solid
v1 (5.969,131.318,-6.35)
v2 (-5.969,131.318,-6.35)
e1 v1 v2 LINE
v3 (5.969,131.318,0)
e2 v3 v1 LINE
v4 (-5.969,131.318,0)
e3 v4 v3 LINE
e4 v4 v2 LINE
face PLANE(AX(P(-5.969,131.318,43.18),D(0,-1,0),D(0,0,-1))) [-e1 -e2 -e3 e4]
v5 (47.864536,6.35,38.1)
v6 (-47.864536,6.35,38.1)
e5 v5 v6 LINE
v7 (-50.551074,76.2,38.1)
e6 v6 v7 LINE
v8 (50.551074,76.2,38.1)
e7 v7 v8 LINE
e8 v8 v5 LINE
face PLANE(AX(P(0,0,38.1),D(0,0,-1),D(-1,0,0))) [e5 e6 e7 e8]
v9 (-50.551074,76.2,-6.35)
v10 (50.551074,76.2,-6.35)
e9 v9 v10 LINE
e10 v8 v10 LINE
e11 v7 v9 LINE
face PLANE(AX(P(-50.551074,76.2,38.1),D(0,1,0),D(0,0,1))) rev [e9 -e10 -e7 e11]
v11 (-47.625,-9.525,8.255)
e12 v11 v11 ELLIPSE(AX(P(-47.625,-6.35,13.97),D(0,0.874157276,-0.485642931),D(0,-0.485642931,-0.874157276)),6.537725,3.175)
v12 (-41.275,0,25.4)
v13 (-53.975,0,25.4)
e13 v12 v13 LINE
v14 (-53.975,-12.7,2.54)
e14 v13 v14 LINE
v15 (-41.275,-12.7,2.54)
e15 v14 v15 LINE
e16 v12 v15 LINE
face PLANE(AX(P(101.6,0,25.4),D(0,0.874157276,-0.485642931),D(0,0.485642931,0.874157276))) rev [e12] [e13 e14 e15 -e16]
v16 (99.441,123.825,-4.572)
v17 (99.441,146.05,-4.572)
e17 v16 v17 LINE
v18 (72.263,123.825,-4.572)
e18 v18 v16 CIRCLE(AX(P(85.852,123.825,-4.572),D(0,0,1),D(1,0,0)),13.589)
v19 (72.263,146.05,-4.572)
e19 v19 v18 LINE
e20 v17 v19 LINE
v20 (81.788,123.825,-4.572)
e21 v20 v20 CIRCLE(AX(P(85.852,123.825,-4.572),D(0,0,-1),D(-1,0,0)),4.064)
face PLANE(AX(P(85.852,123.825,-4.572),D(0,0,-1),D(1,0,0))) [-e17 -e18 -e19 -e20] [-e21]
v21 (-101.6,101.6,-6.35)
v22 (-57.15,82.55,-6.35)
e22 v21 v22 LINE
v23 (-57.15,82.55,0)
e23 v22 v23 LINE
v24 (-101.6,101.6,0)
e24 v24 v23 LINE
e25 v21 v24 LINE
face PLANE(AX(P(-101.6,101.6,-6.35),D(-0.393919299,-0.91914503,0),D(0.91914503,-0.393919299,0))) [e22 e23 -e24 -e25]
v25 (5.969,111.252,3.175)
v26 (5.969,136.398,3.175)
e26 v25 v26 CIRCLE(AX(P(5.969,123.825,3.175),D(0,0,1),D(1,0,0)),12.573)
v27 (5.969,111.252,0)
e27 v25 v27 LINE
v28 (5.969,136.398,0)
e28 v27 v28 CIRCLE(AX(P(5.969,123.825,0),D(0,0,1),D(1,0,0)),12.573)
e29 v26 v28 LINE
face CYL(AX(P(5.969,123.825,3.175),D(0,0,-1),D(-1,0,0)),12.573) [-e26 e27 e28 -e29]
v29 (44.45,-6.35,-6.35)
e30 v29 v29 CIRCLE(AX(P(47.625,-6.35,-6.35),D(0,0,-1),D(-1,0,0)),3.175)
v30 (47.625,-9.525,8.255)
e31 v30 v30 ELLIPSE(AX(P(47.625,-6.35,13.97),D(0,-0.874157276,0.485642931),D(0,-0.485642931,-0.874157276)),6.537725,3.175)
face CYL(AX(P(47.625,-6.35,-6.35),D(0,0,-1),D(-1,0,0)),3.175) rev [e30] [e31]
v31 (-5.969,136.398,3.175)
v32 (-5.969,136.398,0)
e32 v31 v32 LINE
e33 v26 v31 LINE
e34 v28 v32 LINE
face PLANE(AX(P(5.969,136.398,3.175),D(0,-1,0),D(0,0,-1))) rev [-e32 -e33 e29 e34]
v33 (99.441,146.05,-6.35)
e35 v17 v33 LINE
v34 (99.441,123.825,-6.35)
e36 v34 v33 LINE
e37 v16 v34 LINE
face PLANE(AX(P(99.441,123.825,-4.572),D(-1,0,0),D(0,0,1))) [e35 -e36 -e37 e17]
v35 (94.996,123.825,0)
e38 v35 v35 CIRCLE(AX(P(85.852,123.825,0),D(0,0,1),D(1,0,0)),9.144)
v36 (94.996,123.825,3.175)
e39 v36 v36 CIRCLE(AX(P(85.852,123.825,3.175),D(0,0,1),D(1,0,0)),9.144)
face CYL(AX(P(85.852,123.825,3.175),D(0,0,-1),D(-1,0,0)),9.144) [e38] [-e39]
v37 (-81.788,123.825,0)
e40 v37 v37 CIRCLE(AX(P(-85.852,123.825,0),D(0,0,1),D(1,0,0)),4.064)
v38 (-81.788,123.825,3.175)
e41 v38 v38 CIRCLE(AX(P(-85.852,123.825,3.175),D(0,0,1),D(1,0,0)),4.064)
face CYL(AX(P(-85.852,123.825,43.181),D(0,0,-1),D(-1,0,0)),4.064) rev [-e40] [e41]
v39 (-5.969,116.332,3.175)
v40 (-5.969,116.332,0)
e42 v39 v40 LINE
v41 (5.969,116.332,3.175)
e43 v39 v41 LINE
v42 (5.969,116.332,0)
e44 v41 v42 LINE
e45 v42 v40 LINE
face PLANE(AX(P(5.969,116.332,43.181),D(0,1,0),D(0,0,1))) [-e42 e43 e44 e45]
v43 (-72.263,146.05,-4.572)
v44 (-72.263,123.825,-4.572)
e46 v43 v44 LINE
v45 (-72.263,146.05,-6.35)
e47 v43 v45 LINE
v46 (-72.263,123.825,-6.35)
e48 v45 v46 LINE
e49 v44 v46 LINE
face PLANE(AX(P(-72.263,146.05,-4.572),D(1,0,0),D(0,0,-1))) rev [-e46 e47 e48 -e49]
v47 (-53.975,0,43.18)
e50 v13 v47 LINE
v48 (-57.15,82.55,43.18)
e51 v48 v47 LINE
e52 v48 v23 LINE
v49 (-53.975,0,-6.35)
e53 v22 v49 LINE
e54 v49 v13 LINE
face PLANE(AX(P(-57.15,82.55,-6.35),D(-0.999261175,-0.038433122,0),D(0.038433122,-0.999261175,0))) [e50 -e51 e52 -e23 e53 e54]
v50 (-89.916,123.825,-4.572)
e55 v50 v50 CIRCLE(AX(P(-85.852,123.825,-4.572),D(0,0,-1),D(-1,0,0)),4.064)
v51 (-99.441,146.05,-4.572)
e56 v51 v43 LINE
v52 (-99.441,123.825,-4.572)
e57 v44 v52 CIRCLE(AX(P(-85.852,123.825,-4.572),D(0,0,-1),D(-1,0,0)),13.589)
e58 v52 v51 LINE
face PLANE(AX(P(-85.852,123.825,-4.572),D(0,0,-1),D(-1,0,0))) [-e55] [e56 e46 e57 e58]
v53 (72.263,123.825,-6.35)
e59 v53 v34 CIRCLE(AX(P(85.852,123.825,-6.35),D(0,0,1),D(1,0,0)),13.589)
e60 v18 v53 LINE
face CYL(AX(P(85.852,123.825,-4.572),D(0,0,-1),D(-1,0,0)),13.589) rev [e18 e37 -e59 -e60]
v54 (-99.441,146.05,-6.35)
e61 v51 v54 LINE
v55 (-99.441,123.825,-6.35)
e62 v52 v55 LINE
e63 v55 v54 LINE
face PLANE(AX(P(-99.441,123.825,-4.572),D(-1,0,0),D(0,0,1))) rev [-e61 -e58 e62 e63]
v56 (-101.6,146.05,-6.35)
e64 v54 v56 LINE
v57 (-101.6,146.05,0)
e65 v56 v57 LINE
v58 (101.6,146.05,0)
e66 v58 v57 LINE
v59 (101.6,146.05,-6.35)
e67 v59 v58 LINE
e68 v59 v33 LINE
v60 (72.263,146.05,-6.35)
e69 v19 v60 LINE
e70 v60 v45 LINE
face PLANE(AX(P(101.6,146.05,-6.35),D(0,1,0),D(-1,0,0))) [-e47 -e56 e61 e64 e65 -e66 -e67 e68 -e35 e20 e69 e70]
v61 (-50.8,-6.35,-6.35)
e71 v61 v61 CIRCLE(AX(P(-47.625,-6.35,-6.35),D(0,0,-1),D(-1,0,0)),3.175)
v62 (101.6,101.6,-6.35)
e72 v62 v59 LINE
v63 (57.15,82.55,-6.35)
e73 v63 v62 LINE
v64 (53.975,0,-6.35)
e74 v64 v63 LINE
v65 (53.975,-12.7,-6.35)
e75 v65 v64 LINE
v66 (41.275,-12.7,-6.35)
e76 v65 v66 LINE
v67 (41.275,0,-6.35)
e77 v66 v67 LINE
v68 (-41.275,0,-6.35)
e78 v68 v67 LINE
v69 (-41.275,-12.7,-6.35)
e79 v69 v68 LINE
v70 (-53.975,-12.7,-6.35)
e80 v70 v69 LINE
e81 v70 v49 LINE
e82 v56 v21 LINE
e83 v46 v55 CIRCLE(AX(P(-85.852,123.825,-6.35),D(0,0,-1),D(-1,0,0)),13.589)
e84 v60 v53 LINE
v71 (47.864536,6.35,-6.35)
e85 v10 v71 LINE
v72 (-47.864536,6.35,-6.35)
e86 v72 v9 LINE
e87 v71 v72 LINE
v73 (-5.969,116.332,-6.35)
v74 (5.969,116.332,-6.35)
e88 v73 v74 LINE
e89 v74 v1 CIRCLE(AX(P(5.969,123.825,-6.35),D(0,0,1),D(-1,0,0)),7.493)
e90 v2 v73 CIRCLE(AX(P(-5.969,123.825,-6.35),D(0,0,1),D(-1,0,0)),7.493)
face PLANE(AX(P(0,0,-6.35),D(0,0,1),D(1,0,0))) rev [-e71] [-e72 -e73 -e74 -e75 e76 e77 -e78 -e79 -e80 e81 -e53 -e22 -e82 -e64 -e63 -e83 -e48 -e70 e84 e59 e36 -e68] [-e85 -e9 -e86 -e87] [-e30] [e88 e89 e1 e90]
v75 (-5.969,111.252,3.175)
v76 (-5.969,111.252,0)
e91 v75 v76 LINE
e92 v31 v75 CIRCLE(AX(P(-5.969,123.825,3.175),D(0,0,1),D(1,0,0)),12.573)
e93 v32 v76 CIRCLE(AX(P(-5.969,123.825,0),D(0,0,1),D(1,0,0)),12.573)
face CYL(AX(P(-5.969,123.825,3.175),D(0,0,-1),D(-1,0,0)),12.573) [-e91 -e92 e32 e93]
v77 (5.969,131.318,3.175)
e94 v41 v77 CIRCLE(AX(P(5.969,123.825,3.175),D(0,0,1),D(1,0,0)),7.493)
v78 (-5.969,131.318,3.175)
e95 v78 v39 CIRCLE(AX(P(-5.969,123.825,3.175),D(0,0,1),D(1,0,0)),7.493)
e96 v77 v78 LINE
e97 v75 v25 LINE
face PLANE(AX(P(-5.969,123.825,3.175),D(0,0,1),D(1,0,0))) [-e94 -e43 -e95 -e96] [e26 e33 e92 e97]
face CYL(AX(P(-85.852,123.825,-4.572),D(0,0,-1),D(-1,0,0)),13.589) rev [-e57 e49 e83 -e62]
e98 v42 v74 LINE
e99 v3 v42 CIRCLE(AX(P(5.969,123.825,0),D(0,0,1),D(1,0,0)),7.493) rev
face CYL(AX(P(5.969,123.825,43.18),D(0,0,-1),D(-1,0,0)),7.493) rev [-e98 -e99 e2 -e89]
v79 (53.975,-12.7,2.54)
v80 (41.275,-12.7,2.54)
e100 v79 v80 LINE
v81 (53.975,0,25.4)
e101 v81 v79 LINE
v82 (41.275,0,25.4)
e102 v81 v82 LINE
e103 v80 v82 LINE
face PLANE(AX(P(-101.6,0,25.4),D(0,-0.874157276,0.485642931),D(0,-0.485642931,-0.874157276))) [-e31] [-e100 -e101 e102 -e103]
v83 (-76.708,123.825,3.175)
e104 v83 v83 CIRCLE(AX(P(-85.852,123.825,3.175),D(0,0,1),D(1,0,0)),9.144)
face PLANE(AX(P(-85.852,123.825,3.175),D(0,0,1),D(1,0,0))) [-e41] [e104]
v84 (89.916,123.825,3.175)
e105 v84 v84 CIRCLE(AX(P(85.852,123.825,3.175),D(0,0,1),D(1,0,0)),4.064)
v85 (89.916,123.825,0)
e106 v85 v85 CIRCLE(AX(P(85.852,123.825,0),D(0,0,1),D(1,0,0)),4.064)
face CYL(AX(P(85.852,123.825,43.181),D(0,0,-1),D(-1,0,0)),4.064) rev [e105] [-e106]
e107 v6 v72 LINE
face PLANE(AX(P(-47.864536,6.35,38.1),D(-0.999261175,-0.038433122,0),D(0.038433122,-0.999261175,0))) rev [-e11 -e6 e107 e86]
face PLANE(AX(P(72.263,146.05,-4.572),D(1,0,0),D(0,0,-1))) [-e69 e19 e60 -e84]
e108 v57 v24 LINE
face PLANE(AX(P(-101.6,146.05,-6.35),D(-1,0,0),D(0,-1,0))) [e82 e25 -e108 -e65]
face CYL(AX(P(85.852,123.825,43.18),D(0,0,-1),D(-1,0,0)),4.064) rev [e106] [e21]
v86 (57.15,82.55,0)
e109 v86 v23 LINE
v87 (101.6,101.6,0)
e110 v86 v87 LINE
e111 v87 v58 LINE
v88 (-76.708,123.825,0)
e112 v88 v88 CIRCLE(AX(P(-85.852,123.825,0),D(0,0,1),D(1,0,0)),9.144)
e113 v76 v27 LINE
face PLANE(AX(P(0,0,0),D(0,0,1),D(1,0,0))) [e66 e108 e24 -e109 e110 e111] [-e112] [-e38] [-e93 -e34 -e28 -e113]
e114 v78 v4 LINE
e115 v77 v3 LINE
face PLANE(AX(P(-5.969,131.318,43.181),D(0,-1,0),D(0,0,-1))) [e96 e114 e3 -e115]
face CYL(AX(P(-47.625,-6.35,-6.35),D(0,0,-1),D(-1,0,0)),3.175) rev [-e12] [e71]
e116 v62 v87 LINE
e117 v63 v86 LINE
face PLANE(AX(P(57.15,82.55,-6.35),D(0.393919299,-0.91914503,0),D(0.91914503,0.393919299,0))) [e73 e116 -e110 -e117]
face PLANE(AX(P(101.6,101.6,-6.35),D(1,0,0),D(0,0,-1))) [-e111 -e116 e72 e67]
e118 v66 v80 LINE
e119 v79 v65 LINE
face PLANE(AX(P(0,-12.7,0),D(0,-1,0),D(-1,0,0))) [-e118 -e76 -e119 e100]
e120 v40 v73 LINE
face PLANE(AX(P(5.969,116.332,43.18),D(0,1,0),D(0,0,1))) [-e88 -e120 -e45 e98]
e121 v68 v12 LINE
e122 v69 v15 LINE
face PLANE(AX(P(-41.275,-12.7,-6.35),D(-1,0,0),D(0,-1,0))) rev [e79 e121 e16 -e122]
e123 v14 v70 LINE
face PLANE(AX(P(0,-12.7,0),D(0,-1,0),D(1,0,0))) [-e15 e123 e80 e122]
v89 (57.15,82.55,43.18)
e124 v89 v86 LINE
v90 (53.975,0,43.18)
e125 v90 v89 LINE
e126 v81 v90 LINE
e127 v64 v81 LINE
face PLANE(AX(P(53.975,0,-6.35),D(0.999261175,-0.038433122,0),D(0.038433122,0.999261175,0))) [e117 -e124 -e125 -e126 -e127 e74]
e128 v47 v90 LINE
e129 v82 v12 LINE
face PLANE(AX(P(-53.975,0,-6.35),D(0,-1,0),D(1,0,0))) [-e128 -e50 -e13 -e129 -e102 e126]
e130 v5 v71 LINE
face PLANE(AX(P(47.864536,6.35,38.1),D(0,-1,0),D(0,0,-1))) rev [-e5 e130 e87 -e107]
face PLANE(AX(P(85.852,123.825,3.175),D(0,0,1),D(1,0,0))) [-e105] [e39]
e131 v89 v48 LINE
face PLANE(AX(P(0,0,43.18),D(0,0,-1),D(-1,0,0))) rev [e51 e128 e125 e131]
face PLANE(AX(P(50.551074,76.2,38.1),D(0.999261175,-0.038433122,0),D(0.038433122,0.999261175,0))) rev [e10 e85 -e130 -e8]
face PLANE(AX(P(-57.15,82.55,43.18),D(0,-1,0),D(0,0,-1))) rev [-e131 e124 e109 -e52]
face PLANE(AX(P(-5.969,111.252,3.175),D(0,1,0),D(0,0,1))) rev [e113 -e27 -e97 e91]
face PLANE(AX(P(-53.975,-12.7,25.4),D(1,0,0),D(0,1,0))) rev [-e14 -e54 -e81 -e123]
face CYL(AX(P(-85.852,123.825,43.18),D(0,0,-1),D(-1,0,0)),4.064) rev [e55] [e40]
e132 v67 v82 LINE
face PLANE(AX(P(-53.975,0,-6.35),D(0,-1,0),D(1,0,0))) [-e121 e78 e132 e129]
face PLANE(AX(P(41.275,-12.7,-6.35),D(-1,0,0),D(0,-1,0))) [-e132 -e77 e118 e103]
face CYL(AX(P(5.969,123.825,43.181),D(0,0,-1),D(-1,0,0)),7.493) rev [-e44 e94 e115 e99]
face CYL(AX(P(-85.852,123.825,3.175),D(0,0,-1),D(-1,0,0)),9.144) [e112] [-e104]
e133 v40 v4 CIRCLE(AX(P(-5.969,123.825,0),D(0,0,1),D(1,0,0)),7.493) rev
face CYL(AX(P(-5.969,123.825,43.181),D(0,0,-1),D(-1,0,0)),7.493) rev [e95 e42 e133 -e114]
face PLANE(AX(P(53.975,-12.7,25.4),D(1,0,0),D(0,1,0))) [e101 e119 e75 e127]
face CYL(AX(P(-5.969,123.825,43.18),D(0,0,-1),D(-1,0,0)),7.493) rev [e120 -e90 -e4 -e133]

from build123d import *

# Parameters (mm, degrees)
MAIN_BODY_DEPTH                    = 6.35
POCKET_OUTER_SURFACE_DEPTH         = 43.18
POCKET_INSIDE_DEPTH                = 44.45
SKETCH8_W                          = 12.7
SKETCH8_H                          = 31.75
BOTTOM_SCREW_MOUNT_DEPTH           = 12.7
BOTTOM_SCREW_MOUNT_EXTRUSION_DEPTH = 218.712414724
LIGHT_SOCKETS_DEPTH                = 184.078329957
LIGHT_SOCKETS_DEPTH_BACK           = 6.35
SKETCH17_R                         = 4.064
SKETCH18_R                         = 9.144
LIGHT_LIP_LINERS_DEPTH             = 3.175
LIGHT_LIP_SOCKETS_REACH            = 185.078
SKETCH17_2_R                       = 4.064
TAB_SLOTS_DEPTH                    = 1.778
F_1_4_0_25_DIAMETER_HOLE1_D        = 6.35


# Sheet-metal steps are written as plain solids
with BuildPart() as part:
    # Sketch1 → Main Body (new body)
    with BuildSketch(Plane.XY):
        Polygon((-53.975, 0), (53.975, 0), (57.15, 82.55), (101.6, 101.6), (101.6, 146.05), (-101.6, 146.05), (-101.6, 101.6), (-57.15, 82.55), align=None)
    extrude(amount=-MAIN_BODY_DEPTH)

    # Sketch6 → Pocket-Outer Surface (add)
    with BuildSketch(Plane.XY):
        Polygon((53.975, 0), (-53.975, 0), (-57.15, 82.55), (57.15, 82.55), align=None)
    extrude(amount=POCKET_OUTER_SURFACE_DEPTH)

    # Sketch7 → Pocket-Inside (cut)
    with BuildSketch(Plane(origin=(0, 0, -6.35), x_dir=(-1, 0, 0), z_dir=(0, 0, -1))):
        Polygon((-50.551074221, 76.2), (-47.864535759, 6.35), (47.864535759, 6.35), (50.551074221, 76.2), align=None)
    extrude(amount=-POCKET_INSIDE_DEPTH, mode=Mode.SUBTRACT)

    # Sketch8 → Bottom Screw Mount (add)
    with BuildSketch(Plane.XZ):
        with Locations((-47.625, 9.525)):
            Rectangle(SKETCH8_W, SKETCH8_H)
    bottom_screw_mount = extrude(amount=BOTTOM_SCREW_MOUNT_DEPTH)

    # Sketch9 → Bottom Screw Mount Extrusion (cut, through all)
    with BuildSketch(Plane.ZY.offset(53.975)):
        Polygon((2.54, -12.7), (25.4, -12.7), (25.4, 0), align=None)
    bottom_screw_mount_extrusion = extrude(amount=-BOTTOM_SCREW_MOUNT_EXTRUSION_DEPTH, mode=Mode.SUBTRACT)

    # Left Bottom Screw Mount: Bottom Screw Mount, Bottom Screw Mount Extrusion across plane
    add(bottom_screw_mount.mirror(Plane(origin=(0, 0, 0), x_dir=(0, 0, 1), z_dir=(1, 0, 0))))
    add(bottom_screw_mount_extrusion.mirror(Plane(origin=(0, 0, 0), x_dir=(0, 0, 1), z_dir=(1, 0, 0))), mode=Mode.SUBTRACT)

    # Sketch17 → Light Sockets (cut, two sides: drawn at the far end of the back side and taken through both)
    with BuildSketch(Plane.XY.offset(-LIGHT_SOCKETS_DEPTH_BACK)):
        with Locations((85.852, 123.825)):
            Circle(SKETCH17_R)
        with Locations((-85.852, 123.825)):
            Circle(SKETCH17_R)
        with BuildLine():
            Line((-5.969, 131.318), (5.969, 131.318))
            ThreePointArc((5.969, 131.318), (13.462, 123.825), (5.969, 116.332))
            Line((5.969, 116.332), (-5.969, 116.332))
            ThreePointArc((-5.969, 116.332), (-13.462, 123.825), (-5.969, 131.318))
        make_face()
    extrude(amount=LIGHT_SOCKETS_DEPTH + LIGHT_SOCKETS_DEPTH_BACK, mode=Mode.SUBTRACT)

    # Sketch18 → Light Lip Liners (add)
    with BuildSketch(Plane.XY):
        with Locations((-85.852, 123.825)):
            Circle(SKETCH18_R)
        with Locations((85.852, 123.825)):
            Circle(SKETCH18_R)
        with BuildLine():
            Line((5.969, 136.398), (-5.969, 136.398))
            ThreePointArc((-5.969, 136.398), (-18.542, 123.825), (-5.969, 111.252))
            Line((-5.969, 111.252), (5.969, 111.252))
            ThreePointArc((5.969, 111.252), (18.542, 123.825), (5.969, 136.398))
        make_face()
    extrude(amount=LIGHT_LIP_LINERS_DEPTH)

    # Sketch17<2> → Light Lip Sockets (cut, up to next)
    with BuildSketch(Plane.XY, mode=Mode.PRIVATE) as light_lip_sockets_sk1:
        with Locations((85.852, 123.825)):
            Circle(SKETCH17_2_R)
    light_lip_sockets_tool1 = extrude(light_lip_sockets_sk1.sketch, amount=LIGHT_LIP_SOCKETS_REACH, mode=Mode.PRIVATE) & part.part
    # Sketch17<2> → Light Lip Sockets (cut, up to next)
    with BuildSketch(Plane.XY, mode=Mode.PRIVATE) as light_lip_sockets_sk2:
        with Locations((-85.852, 123.825)):
            Circle(SKETCH17_2_R)
    light_lip_sockets_tool2 = extrude(light_lip_sockets_sk2.sketch, amount=LIGHT_LIP_SOCKETS_REACH, mode=Mode.PRIVATE) & part.part
    # Sketch17<2> → Light Lip Sockets (cut, up to next)
    with BuildSketch(Plane.XY, mode=Mode.PRIVATE) as light_lip_sockets_sk3:
        with BuildLine():
            Line((-5.969, 131.318), (5.969, 131.318))
            ThreePointArc((5.969, 131.318), (13.462, 123.825), (5.969, 116.332))
            Line((5.969, 116.332), (-5.969, 116.332))
            ThreePointArc((-5.969, 116.332), (-13.462, 123.825), (-5.969, 131.318))
        make_face()
    light_lip_sockets_tool3 = extrude(light_lip_sockets_sk3.sketch, amount=LIGHT_LIP_SOCKETS_REACH, mode=Mode.PRIVATE) & part.part
    add(light_lip_sockets_tool1.solids().sort_by_distance((85.852, 123.825, 0))[0], mode=Mode.SUBTRACT)
    add(light_lip_sockets_tool2.solids().sort_by_distance((-85.852, 123.825, 0))[0], mode=Mode.SUBTRACT)
    add(light_lip_sockets_tool3.solids().sort_by_distance((0, 123.825, 0))[0], mode=Mode.SUBTRACT)

    # Sketch19 → Tab Slots (cut)
    with BuildSketch(Plane(origin=(0, 0, -6.35), x_dir=(-1, 0, 0), z_dir=(0, 0, -1))):
        with BuildLine():
            Line((72.263, 146.05), (72.263, 123.825))
            ThreePointArc((72.263, 123.825), (85.852, 110.236), (99.441, 123.825))
            Line((99.441, 123.825), (99.441, 146.05))
            Line((99.441, 146.05), (72.263, 146.05))
        make_face()
    tab_slots = extrude(amount=-TAB_SLOTS_DEPTH, mode=Mode.SUBTRACT)

    # Mirror3: Tab Slots across plane
    add(tab_slots.mirror(Plane(origin=(0, 0, 0), x_dir=(0, 0, 1), z_dir=(1, 0, 0))), mode=Mode.SUBTRACT)

    # 1/4 (0.25) Diameter Hole1 (through all)
    with Locations(Plane(origin=(0, 0, -6.35), x_dir=(-1, 0, 0), z_dir=(0, 0, -1))):
        with Locations((-47.625, -6.35), (47.625, -6.35)):
            Hole(F_1_4_0_25_DIAMETER_HOLE1_D / 2)


solid = part.part
